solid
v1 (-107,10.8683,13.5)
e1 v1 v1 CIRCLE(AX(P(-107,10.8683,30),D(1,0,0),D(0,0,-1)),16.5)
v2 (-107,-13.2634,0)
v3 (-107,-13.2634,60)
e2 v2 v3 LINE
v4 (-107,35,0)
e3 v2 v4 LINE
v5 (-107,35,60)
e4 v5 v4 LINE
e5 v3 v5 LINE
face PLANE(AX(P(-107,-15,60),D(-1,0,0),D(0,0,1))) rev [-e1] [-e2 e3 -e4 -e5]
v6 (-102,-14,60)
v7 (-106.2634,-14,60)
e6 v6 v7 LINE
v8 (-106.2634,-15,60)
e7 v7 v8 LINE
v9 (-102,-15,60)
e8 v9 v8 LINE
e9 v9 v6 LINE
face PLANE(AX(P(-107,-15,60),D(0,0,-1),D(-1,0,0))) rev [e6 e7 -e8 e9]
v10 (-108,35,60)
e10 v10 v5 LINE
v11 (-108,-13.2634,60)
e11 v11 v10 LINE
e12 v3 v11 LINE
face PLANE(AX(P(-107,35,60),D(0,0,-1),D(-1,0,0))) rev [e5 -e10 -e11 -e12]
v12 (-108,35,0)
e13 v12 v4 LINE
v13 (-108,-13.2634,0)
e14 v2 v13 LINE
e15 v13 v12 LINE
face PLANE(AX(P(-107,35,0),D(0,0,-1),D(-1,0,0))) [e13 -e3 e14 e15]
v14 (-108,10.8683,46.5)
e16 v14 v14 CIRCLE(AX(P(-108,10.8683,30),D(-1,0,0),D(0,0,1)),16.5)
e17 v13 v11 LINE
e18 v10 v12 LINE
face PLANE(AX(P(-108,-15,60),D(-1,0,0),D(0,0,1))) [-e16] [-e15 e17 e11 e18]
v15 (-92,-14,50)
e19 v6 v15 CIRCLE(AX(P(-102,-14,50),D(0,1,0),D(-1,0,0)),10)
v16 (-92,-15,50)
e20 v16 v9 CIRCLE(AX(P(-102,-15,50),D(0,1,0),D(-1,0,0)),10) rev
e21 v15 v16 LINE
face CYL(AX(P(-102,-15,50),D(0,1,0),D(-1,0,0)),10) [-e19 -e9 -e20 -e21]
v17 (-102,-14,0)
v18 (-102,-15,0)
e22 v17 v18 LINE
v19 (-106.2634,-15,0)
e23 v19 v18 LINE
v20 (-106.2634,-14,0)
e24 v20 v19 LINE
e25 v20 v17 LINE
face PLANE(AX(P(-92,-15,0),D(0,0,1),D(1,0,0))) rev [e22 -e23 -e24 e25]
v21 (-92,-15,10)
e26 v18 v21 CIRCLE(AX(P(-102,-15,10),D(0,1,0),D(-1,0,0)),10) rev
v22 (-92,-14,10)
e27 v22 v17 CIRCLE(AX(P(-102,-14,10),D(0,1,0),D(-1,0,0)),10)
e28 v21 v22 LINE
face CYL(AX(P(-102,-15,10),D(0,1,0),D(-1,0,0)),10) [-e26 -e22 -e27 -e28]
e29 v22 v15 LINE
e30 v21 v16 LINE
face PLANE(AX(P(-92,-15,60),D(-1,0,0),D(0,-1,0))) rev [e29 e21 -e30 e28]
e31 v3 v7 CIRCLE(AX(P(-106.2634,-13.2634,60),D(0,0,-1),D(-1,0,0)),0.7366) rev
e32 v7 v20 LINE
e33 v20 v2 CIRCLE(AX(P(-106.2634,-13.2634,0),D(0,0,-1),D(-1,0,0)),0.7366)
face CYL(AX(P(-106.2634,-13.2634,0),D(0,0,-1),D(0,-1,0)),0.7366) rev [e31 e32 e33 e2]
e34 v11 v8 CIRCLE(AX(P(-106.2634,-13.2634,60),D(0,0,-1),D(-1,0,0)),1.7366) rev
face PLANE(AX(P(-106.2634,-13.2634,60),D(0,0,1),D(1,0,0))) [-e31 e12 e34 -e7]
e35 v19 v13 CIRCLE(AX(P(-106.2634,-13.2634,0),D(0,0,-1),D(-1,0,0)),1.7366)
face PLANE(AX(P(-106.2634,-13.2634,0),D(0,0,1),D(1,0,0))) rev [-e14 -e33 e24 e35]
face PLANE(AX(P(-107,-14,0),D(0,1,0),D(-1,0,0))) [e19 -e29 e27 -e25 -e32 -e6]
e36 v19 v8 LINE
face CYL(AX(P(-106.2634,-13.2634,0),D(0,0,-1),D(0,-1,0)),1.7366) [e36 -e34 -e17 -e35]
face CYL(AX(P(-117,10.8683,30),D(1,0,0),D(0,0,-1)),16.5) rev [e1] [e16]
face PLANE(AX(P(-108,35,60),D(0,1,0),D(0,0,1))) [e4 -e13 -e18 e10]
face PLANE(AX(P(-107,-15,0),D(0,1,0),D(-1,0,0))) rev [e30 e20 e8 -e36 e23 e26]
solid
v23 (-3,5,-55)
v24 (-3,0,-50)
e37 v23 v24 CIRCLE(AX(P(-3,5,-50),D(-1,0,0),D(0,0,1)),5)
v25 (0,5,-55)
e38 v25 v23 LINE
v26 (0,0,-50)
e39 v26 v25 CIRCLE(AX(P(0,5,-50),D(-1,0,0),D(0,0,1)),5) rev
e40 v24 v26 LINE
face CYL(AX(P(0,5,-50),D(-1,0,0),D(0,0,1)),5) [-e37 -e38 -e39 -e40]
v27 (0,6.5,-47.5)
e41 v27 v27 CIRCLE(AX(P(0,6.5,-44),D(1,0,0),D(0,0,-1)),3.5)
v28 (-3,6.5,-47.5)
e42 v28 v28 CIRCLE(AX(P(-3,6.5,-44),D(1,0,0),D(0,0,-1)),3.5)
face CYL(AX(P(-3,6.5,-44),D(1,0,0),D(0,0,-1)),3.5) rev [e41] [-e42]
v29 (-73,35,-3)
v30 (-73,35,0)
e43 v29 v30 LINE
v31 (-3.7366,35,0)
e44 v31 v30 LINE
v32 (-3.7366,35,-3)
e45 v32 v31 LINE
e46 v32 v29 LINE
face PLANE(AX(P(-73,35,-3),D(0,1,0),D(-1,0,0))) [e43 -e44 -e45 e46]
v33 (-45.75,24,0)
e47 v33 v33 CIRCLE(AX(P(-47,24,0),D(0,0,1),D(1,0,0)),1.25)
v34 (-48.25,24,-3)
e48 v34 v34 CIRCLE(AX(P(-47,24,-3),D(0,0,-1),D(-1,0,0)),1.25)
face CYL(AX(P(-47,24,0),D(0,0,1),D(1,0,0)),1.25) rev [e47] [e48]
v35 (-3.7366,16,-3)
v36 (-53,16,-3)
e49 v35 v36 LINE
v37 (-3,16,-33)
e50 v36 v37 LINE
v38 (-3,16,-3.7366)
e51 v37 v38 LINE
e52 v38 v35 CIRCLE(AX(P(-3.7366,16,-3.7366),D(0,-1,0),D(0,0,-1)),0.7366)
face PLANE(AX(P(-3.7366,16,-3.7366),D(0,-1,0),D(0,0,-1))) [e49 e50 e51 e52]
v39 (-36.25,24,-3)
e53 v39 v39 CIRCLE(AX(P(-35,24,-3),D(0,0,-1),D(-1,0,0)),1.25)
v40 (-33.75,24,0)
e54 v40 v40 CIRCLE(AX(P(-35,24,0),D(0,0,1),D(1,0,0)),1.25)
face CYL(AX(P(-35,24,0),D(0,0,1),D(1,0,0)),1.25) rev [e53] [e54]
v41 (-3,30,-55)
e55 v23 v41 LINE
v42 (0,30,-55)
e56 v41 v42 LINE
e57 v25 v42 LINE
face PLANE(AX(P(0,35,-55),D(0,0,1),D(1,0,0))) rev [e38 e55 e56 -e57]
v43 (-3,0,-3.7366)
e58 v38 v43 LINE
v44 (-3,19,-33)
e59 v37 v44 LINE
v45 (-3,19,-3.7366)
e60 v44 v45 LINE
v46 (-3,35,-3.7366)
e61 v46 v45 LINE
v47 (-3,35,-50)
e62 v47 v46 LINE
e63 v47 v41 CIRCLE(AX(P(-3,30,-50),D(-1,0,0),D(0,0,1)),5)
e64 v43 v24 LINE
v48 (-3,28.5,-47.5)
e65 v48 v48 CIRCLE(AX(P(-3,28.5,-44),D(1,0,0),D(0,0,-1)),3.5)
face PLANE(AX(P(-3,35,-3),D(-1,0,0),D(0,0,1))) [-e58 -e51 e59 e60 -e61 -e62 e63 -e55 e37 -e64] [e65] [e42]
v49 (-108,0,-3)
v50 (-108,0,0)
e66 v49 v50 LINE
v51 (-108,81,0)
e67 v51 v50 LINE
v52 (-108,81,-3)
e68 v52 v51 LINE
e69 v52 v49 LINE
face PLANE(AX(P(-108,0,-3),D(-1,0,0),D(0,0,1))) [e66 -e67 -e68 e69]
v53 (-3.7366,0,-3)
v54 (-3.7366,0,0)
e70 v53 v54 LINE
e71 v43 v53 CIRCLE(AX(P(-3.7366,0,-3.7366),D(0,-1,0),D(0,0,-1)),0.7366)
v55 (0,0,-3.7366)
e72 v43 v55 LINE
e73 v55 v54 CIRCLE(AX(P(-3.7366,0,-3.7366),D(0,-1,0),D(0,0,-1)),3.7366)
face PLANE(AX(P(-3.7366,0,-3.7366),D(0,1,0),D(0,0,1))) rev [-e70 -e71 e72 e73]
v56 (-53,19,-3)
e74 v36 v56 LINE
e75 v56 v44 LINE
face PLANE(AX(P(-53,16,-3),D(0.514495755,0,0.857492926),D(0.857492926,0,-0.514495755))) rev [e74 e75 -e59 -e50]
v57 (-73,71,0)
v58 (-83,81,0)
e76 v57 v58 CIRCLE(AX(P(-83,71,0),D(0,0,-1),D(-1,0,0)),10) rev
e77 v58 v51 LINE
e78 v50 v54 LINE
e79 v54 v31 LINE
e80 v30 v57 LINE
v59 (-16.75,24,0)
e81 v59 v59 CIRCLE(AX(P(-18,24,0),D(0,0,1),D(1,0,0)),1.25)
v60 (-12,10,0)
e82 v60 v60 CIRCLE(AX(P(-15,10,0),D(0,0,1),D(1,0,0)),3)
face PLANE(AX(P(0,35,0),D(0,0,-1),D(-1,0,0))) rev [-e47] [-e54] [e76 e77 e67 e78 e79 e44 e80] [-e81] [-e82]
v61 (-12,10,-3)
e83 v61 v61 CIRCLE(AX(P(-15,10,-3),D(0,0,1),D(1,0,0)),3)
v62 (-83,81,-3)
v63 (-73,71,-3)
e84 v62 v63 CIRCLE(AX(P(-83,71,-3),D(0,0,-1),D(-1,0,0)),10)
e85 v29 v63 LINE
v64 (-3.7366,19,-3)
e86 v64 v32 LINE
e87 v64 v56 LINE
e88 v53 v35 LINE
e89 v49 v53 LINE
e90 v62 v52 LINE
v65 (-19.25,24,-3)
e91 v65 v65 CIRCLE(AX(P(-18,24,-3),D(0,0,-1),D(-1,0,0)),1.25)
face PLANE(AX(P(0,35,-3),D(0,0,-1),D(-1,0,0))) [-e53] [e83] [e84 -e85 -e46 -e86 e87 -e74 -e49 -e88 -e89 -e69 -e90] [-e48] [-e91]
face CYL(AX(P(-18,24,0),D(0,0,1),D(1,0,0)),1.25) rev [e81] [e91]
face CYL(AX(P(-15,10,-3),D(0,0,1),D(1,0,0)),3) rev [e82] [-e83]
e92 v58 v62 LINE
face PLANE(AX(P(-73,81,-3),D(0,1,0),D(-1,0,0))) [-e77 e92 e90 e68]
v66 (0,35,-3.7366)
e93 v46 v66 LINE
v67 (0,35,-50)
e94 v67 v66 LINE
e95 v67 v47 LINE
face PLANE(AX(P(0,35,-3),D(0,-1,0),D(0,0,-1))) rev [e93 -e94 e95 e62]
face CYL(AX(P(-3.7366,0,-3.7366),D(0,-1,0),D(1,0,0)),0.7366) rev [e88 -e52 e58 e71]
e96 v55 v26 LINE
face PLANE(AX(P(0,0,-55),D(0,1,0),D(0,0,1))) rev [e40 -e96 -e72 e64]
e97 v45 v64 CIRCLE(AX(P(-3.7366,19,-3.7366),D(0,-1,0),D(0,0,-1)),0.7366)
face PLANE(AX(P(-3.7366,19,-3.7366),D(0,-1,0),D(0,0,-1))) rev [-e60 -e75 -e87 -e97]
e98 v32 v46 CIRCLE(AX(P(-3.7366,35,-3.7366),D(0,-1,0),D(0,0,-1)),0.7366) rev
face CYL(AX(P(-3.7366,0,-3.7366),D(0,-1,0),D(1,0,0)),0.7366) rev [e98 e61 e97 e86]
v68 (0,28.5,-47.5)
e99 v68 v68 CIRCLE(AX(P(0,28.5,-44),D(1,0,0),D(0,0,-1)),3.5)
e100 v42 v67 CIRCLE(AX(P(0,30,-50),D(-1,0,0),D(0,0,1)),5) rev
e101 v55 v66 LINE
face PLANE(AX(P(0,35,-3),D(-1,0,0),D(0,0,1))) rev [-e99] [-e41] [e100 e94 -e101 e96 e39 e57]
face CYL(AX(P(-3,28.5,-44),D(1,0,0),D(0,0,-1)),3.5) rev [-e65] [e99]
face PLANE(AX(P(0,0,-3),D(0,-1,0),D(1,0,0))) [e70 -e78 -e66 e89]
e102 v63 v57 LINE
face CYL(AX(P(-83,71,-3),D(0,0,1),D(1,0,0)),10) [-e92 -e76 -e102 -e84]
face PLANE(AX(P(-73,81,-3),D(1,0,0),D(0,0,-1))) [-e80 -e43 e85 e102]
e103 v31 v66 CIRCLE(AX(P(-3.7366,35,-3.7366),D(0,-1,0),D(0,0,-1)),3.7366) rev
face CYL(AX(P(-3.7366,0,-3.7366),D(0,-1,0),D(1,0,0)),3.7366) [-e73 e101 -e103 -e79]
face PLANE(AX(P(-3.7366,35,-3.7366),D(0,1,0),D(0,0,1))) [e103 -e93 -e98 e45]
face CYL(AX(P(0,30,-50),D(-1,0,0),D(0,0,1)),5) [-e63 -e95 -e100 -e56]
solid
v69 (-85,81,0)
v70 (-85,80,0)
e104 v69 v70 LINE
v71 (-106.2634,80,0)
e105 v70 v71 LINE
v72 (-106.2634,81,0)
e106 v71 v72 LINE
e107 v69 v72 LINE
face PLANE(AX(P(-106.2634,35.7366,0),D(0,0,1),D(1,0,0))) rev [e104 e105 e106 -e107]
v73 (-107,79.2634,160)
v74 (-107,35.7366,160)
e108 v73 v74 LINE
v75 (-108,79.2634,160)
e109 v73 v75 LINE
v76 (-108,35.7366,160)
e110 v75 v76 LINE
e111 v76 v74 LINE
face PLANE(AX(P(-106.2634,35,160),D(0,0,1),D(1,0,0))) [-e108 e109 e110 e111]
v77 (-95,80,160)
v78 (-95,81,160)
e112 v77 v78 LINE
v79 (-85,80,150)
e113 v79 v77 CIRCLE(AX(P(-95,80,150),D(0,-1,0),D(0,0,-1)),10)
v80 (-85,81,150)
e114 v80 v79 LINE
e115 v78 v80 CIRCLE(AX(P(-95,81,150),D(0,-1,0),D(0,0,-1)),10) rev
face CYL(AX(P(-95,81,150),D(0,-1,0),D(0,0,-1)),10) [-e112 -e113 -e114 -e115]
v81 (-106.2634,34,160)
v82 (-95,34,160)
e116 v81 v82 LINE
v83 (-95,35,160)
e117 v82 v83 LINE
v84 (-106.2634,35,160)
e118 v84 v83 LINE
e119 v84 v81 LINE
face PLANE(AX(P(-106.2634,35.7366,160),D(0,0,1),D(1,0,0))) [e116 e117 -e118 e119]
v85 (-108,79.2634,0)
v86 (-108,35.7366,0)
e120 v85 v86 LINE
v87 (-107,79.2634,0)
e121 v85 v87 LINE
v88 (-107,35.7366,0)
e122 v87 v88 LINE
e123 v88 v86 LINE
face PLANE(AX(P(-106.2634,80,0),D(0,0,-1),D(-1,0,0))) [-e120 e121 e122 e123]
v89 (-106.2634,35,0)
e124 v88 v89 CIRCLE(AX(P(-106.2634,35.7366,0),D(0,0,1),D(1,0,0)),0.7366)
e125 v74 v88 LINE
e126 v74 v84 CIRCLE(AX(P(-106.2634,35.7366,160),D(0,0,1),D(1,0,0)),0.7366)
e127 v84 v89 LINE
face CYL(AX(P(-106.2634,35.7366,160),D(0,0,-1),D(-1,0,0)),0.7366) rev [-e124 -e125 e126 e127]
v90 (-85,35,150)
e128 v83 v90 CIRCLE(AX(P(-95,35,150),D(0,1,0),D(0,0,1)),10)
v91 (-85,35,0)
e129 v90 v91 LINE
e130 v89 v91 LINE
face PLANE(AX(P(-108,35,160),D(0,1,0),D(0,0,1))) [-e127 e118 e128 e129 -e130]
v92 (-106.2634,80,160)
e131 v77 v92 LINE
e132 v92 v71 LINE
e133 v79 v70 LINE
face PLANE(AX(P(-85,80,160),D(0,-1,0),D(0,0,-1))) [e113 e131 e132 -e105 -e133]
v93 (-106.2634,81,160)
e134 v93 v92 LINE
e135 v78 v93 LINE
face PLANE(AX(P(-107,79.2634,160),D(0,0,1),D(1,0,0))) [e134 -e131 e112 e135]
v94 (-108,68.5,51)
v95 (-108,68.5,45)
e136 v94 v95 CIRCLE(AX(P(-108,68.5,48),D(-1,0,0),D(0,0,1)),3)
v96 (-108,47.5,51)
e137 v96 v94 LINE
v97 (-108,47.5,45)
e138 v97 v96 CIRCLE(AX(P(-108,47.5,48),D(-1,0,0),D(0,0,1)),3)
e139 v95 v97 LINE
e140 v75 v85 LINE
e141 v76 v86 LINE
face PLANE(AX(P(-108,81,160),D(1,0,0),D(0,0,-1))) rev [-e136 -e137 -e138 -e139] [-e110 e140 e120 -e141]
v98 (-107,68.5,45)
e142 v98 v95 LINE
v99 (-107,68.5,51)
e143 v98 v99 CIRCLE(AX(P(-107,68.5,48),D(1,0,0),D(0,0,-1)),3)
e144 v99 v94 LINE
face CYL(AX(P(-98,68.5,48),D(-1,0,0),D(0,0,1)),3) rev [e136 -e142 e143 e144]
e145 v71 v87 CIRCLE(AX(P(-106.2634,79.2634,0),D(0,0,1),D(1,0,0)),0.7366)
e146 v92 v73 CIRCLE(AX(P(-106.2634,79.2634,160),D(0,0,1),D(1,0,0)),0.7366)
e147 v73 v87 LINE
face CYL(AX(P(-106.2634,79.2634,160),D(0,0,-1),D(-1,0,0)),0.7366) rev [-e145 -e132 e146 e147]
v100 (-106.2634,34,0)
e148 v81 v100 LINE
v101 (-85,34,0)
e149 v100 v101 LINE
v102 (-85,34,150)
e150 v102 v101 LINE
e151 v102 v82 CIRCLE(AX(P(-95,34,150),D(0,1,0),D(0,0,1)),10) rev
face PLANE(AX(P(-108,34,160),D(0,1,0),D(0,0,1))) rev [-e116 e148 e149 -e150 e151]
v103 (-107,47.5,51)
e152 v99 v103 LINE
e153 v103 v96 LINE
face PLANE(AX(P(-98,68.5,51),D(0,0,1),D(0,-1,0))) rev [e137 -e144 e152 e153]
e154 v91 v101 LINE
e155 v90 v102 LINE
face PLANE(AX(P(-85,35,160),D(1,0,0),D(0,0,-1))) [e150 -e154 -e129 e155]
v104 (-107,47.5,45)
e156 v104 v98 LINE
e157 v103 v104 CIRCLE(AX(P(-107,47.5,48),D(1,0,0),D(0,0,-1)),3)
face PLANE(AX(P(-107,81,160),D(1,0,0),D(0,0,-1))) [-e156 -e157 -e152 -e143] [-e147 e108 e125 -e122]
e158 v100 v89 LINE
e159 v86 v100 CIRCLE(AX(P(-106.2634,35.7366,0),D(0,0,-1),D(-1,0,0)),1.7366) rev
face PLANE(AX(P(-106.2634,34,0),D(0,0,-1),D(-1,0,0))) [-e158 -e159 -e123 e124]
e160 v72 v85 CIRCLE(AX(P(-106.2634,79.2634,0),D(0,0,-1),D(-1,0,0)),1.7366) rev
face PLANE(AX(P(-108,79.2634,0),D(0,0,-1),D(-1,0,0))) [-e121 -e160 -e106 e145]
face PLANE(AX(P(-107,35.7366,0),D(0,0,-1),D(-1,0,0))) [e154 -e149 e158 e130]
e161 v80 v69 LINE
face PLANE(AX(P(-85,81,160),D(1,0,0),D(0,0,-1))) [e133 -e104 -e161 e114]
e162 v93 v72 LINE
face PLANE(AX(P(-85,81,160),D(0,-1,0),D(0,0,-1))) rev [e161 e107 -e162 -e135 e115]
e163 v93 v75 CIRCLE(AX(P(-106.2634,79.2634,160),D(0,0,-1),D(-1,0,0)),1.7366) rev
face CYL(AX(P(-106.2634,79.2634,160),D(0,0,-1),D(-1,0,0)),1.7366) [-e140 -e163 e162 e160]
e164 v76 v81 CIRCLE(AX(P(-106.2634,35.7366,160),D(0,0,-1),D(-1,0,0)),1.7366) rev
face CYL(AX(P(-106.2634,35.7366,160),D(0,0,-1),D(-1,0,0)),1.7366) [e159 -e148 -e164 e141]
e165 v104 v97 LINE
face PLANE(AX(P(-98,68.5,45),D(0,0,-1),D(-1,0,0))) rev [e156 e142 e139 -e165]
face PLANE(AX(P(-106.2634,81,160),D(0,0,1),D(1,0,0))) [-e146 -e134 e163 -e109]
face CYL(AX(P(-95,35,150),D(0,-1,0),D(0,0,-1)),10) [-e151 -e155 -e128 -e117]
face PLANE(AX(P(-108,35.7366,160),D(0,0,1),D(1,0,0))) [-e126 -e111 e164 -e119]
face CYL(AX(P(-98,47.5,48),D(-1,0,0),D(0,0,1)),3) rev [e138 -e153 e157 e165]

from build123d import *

# Parameters (mm, degrees)
SM_BASE_FLANGE_1_DEPTH           = 3
SM_EDGE_FLANGE_1_STRIP_W         = 13.4732
SM_EDGE_FLANGE_1_STRIP_H         = 3
SM_EDGE_FLANGE_1_STRIP_CUT_DEPTH = 35
SM_EDGE_FLANGE_1_DEPTH           = 35
SM_BASE_FLANGE_2_DEPTH           = 160
CUT_EXTRUDE_3_DEPTH              = 10
EXTRUDE_START                    = -17.5
EXTRUDE_1_DEPTH                  = 1.5
FILLET_3_R                       = 10
SKETCH_15_R                      = 3.5
CUT_EXTRUDE_5_DEPTH              = 3
FILLET_4_R                       = 5
HOLE_WIZARD_M3_1_AT_2_COUNT      = 2
HOLE_WIZARD_M3_1_AT_2_PITCH      = 12
HOLE_WIZARD_M3_1_AT_3_COUNT      = 2
HOLE_WIZARD_M3_1_AT_3_PITCH      = 29
SKETCH_18_R                      = 3
CUT_EXTRUDE_6_DEPTH              = 3
SKETCH_20_W                      = 1
SKETCH_20_H                      = 50
SM_BASE_FLANGE_3_DEPTH           = 60
SM_EDGE_FLANGE_2_STRIP_W         = 5.4732
SM_EDGE_FLANGE_2_STRIP_H         = 1
SM_EDGE_FLANGE_2_STRIP_CUT_DEPTH = 60
SM_EDGE_FLANGE_2_DEPTH           = 60
SKETCH_28_R                      = 16.5
CUT_EXTRUDE_7_DEPTH              = 10
FILLET_5_R                       = 10
FILLET_6_R                       = 10


# Sheet-metal steps are written as plain solids
with BuildPart() as part:
    # Sketch 1 → 基体-法兰1 (new body)
    with BuildSketch(Plane.XY):
        Polygon((0, 0), (-108, 0), (-108, 81), (-73, 81), (-73, 35), (0, 35), align=None)
    extrude(amount=-SM_BASE_FLANGE_1_DEPTH)

    # 边线-法兰1 strip (across the edge) → 边线-法兰1 strip cut (cut)
    with BuildSketch(Plane(origin=(0, 35, -3), x_dir=(-1, 0, 0), z_dir=(0, -1, 0))):
        with Locations((-3, -1.5)):
            Rectangle(SM_EDGE_FLANGE_1_STRIP_W, SM_EDGE_FLANGE_1_STRIP_H)
    extrude(amount=SM_EDGE_FLANGE_1_STRIP_CUT_DEPTH, mode=Mode.SUBTRACT)

    # 边线-法兰1 section (across the edge) → 边线-法兰1 (add)
    with BuildSketch(Plane(origin=(0, 35, -3), x_dir=(-1, 0, 0), z_dir=(0, -1, 0))):
        with BuildLine():
            Line((0, 0.7366), (0, 52))
            Line((0, 52), (3, 52))
            Line((3, 52), (3, 0.7366))
            ThreePointArc((3, 0.7366), (3.215745145, 0.215745145), (3.7366, 0))
            Line((3.7366, 0), (3.7366, -3))
            ThreePointArc((3.7366, -3), (1.094424801, -1.905575199), (0, 0.7366))
        make_face()
    extrude(amount=SM_EDGE_FLANGE_1_DEPTH)

    # 草图14 → 凸台-拉伸1 (add, symmetric)
    with BuildSketch(Plane.XZ.offset(EXTRUDE_START)):
        with BuildLine():
            Line((-3, -3.7366), (-3, -33))
            Line((-3, -33), (-53, -3))
            Line((-53, -3), (-3.7366, -3))
            ThreePointArc((-3.7366, -3), (-3.215745145, -3.215745145), (-3, -3.7366))
        make_face()
    extrude(amount=EXTRUDE_1_DEPTH, both=True)

    # 草图15 → 切除-拉伸5 (cut)
    with BuildSketch(Plane(origin=(0, 0, 0), x_dir=(0, 0, -1), z_dir=(1, 0, 0))):
        with Locations((44, 6.5)):
            Circle(SKETCH_15_R)
        with Locations((44, 28.5)):
            Circle(SKETCH_15_R)
    extrude(amount=-CUT_EXTRUDE_5_DEPTH, mode=Mode.SUBTRACT)

    # 圆角4
    fillet_4_edges = [part.edges().sort_by_distance(p)[0] for p in [
        (-1.5, 35, -55),
        (-1.5, 0, -55),
    ]]
    fillet(fillet_4_edges, radius=FILLET_4_R)

    # 草图16 → M3 螺纹孔1 (revolve, cut)
    with BuildSketch(Plane(origin=(-47, 24, 0), x_dir=(0, -1, 0), z_dir=(1, 0, 0))):
        Polygon((0, 0), (0, 8.251075774), (1.25, 7.5), (1.25, 0), align=None)
    hole_wizard_m3_1 = revolve(axis=Axis((-47, 24, 6.35), (0, 0, -1)), mode=Mode.SUBTRACT)

    # M3 螺纹孔1 at 2: M3 螺纹孔1 ×2
    with Locations(*[(i * HOLE_WIZARD_M3_1_AT_2_PITCH, 0, 0) for i in range(1, HOLE_WIZARD_M3_1_AT_2_COUNT)]):
        add(hole_wizard_m3_1, mode=Mode.SUBTRACT)

    # M3 螺纹孔1 at 3: M3 螺纹孔1 ×2
    with Locations(*[(i * HOLE_WIZARD_M3_1_AT_3_PITCH, 0, 0) for i in range(1, HOLE_WIZARD_M3_1_AT_3_COUNT)]):
        add(hole_wizard_m3_1, mode=Mode.SUBTRACT)

    # 草图18 → 切除-拉伸6 (cut)
    with BuildSketch(Plane.XY):
        with Locations((-15, 10)):
            Circle(SKETCH_18_R)
    extrude(amount=-CUT_EXTRUDE_6_DEPTH, mode=Mode.SUBTRACT)

    # 圆角6
    fillet_6_edges = [part.edges().sort_by_distance(p)[0] for p in [
        (-73, 81, -1.5),
    ]]
    fillet(fillet_6_edges, radius=FILLET_6_R)


with BuildPart() as body_2:
    # 草图6 → 基体-法兰2 (new body)
    with BuildSketch(Plane.XY):
        with BuildLine():
            Line((-85, 81), (-106.2634, 81))
            ThreePointArc((-106.2634, 81), (-107.491361636, 80.491361636), (-108, 79.2634))
            Line((-108, 79.2634), (-108, 35.7366))
            ThreePointArc((-108, 35.7366), (-107.491361636, 34.508638364), (-106.2634, 34))
            Line((-106.2634, 34), (-85, 34))
            Line((-85, 34), (-85, 35))
            Line((-85, 35), (-106.2634, 35))
            ThreePointArc((-106.2634, 35), (-106.784254855, 35.215745145), (-107, 35.7366))
            Line((-107, 35.7366), (-107, 79.2634))
            ThreePointArc((-107, 79.2634), (-106.784254855, 79.784254855), (-106.2634, 80))
            Line((-106.2634, 80), (-85, 80))
            Line((-85, 80), (-85, 81))
        make_face()
    extrude(amount=SM_BASE_FLANGE_2_DEPTH)

    # 草图12 → 切除-拉伸3 (cut)
    with BuildSketch(Plane.ZY.offset(108)):
        with BuildLine():
            Line((51, 68.5), (51, 47.5))
            ThreePointArc((51, 47.5), (48, 44.5), (45, 47.5))
            Line((45, 47.5), (45, 68.5))
            ThreePointArc((45, 68.5), (48, 71.5), (51, 68.5))
        make_face()
    extrude(amount=-CUT_EXTRUDE_3_DEPTH, mode=Mode.SUBTRACT)

    # 圆角3
    fillet_3_edges = [body_2.edges().sort_by_distance(p)[0] for p in [
        (-85, 80.5, 160),
        (-85, 34.5, 160),
    ]]
    fillet(fillet_3_edges, radius=FILLET_3_R)


with BuildPart() as body_3:
    # 草图20 → 基体-法兰3 (new body)
    with BuildSketch(Plane.XY):
        with Locations((-107.5, 10)):
            Rectangle(SKETCH_20_W, SKETCH_20_H)
    extrude(amount=SM_BASE_FLANGE_3_DEPTH)

    # 边线-法兰2 strip (across the edge) → 边线-法兰2 strip cut (cut)
    with BuildSketch(Plane(origin=(-107, -15, 60), x_dir=(0, 1, 0), z_dir=(0, 0, -1))):
        with Locations((-1, -0.5)):
            Rectangle(SM_EDGE_FLANGE_2_STRIP_W, SM_EDGE_FLANGE_2_STRIP_H)
    extrude(amount=SM_EDGE_FLANGE_2_STRIP_CUT_DEPTH, mode=Mode.SUBTRACT)

    # 边线-法兰2 section (across the edge) → 边线-法兰2 (add)
    with BuildSketch(Plane(origin=(-107, -15, 60), x_dir=(0, 1, 0), z_dir=(0, 0, -1))):
        with BuildLine():
            Line((0, 0.7366), (0, 15))
            Line((0, 15), (1, 15))
            Line((1, 15), (1, 0.7366))
            ThreePointArc((1, 0.7366), (1.215745145, 0.215745145), (1.7366, 0))
            Line((1.7366, 0), (1.7366, -1))
            ThreePointArc((1.7366, -1), (0.508638364, -0.491361636), (0, 0.7366))
        make_face()
    extrude(amount=SM_EDGE_FLANGE_2_DEPTH)

    # 草图28 → 切除-拉伸7 (cut)
    with BuildSketch(Plane(origin=(-107, 0, 0), x_dir=(0, 0, -1), z_dir=(1, 0, 0))):
        with Locations((-30, 10.8683)):
            Circle(SKETCH_28_R)
    extrude(amount=-CUT_EXTRUDE_7_DEPTH, mode=Mode.SUBTRACT)

    # 圆角5
    fillet_5_edges = [body_3.edges().sort_by_distance(p)[0] for p in [
        (-92, -14.5, 60),
        (-92, -14.5, 0),
    ]]
    fillet(fillet_5_edges, radius=FILLET_5_R)


solid = Compound([part.part, body_2.part, body_3.part])
